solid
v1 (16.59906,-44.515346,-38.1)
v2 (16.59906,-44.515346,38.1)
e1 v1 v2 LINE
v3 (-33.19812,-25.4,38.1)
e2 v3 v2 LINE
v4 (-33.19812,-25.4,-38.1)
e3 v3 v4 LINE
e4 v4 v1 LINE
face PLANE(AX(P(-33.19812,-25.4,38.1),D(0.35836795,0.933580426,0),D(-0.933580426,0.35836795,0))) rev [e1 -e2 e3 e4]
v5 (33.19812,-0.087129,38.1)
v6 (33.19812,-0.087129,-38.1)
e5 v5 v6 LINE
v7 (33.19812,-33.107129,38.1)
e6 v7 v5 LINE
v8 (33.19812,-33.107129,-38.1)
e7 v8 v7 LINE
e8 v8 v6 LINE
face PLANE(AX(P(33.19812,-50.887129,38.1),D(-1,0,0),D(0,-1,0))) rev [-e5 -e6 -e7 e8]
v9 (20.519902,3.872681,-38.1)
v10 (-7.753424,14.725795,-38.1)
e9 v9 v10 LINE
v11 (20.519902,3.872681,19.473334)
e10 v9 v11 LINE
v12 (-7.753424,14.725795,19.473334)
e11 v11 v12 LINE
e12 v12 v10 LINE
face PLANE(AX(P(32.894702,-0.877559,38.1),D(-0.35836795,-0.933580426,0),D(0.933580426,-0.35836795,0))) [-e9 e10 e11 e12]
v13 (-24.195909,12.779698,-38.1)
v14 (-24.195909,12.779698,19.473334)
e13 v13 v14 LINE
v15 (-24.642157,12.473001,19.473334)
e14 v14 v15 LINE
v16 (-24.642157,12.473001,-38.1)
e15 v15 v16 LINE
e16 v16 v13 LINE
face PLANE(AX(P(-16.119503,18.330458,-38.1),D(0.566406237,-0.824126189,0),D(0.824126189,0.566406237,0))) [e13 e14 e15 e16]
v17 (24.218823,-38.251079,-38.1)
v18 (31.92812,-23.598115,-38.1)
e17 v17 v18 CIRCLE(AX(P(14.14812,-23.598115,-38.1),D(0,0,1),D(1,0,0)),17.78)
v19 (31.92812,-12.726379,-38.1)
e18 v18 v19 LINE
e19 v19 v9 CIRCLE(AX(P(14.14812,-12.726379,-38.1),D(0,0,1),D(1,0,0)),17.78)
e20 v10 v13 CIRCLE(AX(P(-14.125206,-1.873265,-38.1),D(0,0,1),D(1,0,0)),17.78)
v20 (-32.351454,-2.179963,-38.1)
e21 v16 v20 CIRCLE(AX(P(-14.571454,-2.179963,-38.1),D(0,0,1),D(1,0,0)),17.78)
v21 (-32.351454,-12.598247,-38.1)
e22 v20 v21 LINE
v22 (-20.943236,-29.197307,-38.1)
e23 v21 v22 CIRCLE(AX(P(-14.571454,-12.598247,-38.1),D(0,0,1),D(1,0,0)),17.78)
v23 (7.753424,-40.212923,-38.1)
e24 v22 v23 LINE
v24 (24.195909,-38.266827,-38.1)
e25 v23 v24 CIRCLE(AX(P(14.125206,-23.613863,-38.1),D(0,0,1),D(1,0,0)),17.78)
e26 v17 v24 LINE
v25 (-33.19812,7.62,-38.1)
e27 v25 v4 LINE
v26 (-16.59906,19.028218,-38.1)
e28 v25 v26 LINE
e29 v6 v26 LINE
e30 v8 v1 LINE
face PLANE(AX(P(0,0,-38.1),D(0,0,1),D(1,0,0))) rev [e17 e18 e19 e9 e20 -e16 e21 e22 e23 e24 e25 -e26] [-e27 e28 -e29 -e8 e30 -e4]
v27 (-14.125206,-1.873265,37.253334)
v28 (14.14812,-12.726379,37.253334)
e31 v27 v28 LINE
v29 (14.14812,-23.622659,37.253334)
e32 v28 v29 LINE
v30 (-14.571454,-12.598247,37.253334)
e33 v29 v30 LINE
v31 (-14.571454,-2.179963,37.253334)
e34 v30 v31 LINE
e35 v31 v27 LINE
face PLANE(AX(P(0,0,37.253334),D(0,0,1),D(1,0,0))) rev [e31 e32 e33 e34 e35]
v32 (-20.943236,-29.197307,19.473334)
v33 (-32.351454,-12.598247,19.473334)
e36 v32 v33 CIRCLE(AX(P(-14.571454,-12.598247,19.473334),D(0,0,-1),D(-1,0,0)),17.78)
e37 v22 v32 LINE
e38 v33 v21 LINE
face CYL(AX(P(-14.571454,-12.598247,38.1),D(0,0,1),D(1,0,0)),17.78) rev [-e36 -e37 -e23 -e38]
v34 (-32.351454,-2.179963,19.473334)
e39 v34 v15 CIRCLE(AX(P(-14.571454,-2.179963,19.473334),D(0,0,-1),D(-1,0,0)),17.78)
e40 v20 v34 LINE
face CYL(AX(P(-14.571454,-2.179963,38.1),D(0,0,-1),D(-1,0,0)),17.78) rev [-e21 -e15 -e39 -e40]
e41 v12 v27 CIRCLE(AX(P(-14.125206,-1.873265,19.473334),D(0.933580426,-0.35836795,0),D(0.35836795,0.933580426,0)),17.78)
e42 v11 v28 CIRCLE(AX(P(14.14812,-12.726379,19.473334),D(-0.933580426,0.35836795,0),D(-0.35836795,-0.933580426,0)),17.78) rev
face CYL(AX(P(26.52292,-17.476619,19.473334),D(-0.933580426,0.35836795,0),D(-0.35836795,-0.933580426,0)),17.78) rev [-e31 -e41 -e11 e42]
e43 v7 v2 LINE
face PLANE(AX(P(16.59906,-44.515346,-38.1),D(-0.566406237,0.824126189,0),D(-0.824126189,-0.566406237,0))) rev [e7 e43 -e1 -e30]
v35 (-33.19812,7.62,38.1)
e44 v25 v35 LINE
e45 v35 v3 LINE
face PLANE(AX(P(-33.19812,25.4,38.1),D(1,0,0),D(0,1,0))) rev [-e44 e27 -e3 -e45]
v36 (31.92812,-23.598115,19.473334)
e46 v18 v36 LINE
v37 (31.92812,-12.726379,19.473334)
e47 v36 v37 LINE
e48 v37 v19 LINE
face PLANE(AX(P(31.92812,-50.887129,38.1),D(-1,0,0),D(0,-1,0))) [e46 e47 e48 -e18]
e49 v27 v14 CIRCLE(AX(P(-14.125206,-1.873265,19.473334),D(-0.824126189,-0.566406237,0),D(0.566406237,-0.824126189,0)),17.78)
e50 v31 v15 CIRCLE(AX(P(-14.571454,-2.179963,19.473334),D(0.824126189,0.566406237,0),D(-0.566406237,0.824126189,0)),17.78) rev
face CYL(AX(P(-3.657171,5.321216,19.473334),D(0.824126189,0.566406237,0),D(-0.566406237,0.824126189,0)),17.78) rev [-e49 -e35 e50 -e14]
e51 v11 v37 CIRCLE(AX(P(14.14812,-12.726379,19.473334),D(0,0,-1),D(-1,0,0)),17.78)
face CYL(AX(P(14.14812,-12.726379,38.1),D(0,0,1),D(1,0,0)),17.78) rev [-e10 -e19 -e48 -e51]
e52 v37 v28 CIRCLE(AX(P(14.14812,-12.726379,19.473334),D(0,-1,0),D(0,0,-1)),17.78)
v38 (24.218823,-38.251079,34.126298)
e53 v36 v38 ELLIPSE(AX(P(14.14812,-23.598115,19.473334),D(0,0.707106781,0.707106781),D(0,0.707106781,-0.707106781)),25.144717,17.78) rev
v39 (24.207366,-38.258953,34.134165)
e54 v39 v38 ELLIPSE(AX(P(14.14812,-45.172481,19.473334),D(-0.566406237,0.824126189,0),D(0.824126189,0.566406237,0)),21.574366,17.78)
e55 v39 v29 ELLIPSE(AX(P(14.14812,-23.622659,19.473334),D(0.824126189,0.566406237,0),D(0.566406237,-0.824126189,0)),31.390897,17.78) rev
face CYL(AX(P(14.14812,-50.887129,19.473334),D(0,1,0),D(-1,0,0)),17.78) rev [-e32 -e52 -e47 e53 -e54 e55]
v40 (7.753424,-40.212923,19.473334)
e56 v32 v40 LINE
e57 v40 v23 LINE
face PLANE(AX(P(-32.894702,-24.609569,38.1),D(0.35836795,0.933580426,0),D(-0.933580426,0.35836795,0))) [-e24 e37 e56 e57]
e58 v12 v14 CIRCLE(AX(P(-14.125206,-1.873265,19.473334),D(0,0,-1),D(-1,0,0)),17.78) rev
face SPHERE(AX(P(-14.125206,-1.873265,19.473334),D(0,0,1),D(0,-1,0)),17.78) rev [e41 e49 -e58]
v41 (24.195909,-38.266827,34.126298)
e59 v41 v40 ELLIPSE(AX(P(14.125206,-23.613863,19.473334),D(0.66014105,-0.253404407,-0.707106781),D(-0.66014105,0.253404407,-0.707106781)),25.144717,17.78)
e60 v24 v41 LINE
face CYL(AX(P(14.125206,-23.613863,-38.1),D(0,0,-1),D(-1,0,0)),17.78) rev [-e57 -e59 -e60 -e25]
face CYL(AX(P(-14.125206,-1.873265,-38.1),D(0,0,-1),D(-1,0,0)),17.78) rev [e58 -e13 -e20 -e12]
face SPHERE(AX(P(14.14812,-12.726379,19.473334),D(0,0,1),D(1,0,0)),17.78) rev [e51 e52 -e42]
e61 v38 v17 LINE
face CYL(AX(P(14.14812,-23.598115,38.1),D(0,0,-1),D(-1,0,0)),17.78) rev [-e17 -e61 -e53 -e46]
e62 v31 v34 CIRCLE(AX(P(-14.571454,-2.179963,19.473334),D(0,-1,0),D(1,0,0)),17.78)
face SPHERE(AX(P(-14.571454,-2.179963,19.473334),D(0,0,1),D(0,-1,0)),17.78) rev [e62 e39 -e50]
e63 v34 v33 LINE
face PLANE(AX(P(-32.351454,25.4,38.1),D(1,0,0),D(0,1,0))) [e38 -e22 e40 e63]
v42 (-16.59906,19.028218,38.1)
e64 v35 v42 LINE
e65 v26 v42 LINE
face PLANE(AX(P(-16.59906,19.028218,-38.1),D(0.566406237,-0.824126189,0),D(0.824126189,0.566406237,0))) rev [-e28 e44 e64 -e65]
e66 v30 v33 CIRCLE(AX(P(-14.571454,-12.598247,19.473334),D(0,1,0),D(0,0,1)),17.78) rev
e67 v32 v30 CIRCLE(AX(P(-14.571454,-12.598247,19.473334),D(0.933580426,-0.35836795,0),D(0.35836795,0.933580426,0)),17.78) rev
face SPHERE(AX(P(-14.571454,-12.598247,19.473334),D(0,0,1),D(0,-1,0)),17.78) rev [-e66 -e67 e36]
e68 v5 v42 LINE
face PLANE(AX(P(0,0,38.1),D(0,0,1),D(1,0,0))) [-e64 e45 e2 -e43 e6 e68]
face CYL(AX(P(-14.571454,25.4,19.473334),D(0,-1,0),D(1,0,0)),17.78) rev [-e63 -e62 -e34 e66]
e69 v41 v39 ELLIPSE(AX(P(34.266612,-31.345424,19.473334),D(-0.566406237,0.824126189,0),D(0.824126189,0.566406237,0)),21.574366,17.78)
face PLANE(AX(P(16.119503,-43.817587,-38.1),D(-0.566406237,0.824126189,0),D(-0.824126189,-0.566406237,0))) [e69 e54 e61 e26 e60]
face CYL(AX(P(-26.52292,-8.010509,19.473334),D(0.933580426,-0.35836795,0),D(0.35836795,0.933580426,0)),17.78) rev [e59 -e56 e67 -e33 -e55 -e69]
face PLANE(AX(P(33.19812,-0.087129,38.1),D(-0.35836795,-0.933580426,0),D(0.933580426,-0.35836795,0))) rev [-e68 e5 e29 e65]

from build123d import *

# Parameters (mm, degrees)
BOSS_EXTRUDE1_DEPTH = 38.1
CUT_EXTRUDE1_DEPTH  = 98.457965419
SHELL1_START        = -38.1
SHELL1_DEPTH        = 75.35333418
FILLET1_R           = 17.78


# Read off the part's stored shape, not the designer's step: Shell1
with BuildPart() as part:
    # Sketch1 → Boss-Extrude1 (new, symmetric)
    with BuildSketch(Plane.XY):
        Polygon((-33.198119966, 25.4), (-33.198119966, -25.4), (33.198119966, -50.887128572), (33.198119966, -0.087128572), align=None)
    extrude(amount=BOSS_EXTRUDE1_DEPTH, both=True)

    # Sketch2 → Cut-Extrude1 (cut, through all)
    with BuildSketch(Plane.XY.offset(38.1)):
        Polygon((16.599059983, -44.515346429), (33.198119966, -33.107128572), (33.198119966, -50.887128572), align=None)
        Polygon((-16.599059983, 19.028217857), (-33.198119966, 25.4), (-33.198119966, 7.62), align=None)
    extrude(amount=-CUT_EXTRUDE1_DEPTH, mode=Mode.SUBTRACT)

    # Shell1 outline → Shell1 (cut)
    with BuildSketch(Plane.XY.offset(SHELL1_START)):
        Polygon((31.928119966, -0.506523102), (-16.486612201, 18.078151343), (-32.351454146, 7.174547563), (-32.351454146, -24.818102704), (16.486612201, -43.565279915), (31.928119966, -32.952625656), align=None)
    extrude(amount=SHELL1_DEPTH, mode=Mode.SUBTRACT)

    # Fillet1
    # the kernel refuses this fillet: 17.78 mm, written as the material it adds along each edge
    with BuildSketch(Plane(origin=(-14.571454146, -2.179962965, 19.47333418), x_dir=(-0.5664062369240325, 0.8241261886225658, 0), z_dir=(0, 0, 1))) as fillet1_piece_1_section:
        Polygon((0, 0), (FILLET1_R * 1.02, 0), (FILLET1_R * 1.02, FILLET1_R * 0.536647960523), (FILLET1_R * 0.577734361663, FILLET1_R * 0.840608712395), align=None)
    fillet1_piece_1 = extrude(amount=FILLET1_R * 1.02, mode=Mode.PRIVATE)
    fillet1_piece_1 = fillet1_piece_1 - Plane(origin=(-14.571454146, -2.179962965, 19.47333418), x_dir=(0.8849876374628157, -0.4656145203255411, 0), z_dir=(0, 0, 1)) * Sphere(FILLET1_R, mode=Mode.PRIVATE)
    add(fillet1_piece_1)
    with BuildSketch(Plane(origin=(-14.571454146, -12.59824726, 19.47333418), x_dir=(-1, 0, 0), z_dir=(0, 0, 1))) as fillet1_piece_2_section:
        Polygon((0, 0), (FILLET1_R * 1.02, 0), (FILLET1_R * 1.02, FILLET1_R * 0.701026577777), (FILLET1_R * 0.365535308531, FILLET1_R * 0.952252035029), align=None)
    fillet1_piece_2 = extrude(amount=FILLET1_R * 1.02, mode=Mode.PRIVATE)
    fillet1_piece_2 = fillet1_piece_2 - Plane(origin=(-14.571454146, -12.59824726, 19.47333418), x_dir=(0.8241261886205663, 0.5664062369269417, 0), z_dir=(0, 0, 1)) * Sphere(FILLET1_R, mode=Mode.PRIVATE)
    add(fillet1_piece_2)
    with BuildSketch(Plane(origin=(14.148119966, -12.726378546, 19.47333418), x_dir=(0.35836794954893786, 0.9335804264958054, 0), z_dir=(0, 0, 1))) as fillet1_piece_3_section:
        Polygon((0, 0), (FILLET1_R * 1.02, 0), (FILLET1_R * 1.02, -FILLET1_R * 0.701026577771), (FILLET1_R * 0.36553530854, -FILLET1_R * 0.952252035026), align=None)
    fillet1_piece_3 = extrude(amount=FILLET1_R * 1.02, mode=Mode.PRIVATE)
    fillet1_piece_3 = fillet1_piece_3 - Plane(origin=(14.148119966, -12.726378546, 19.47333418), x_dir=(-0.824126188623119, -0.5664062369232272, 0), z_dir=(0, 0, 1)) * Sphere(FILLET1_R, mode=Mode.PRIVATE)
    add(fillet1_piece_3)
    with BuildSketch(Plane(origin=(-14.125206416, -1.873265397, 19.47333418), x_dir=(0.35836794954893786, 0.9335804264958054, 0), z_dir=(0, 0, 1))) as fillet1_piece_4_section:
        Polygon((0, 0), (FILLET1_R * 1.02, 0), (FILLET1_R * 1.02, FILLET1_R * 0.536647960524), (FILLET1_R * 0.577734361661, FILLET1_R * 0.840608712396), align=None)
    fillet1_piece_4 = extrude(amount=FILLET1_R * 1.02, mode=Mode.PRIVATE)
    fillet1_piece_4 = fillet1_piece_4 - Plane(origin=(-14.125206416, -1.873265397, 19.47333418), x_dir=(0.11753739745542074, -0.9930684569552123, 0), z_dir=(0, 0, 1)) * Sphere(FILLET1_R, mode=Mode.PRIVATE)
    add(fillet1_piece_4)
    with BuildSketch(Plane(origin=(-32.351454146, -2.179962965, 37.25333418), x_dir=(0, 0, -1), z_dir=(0, -1, 0))) as fillet1_piece_5:
        with BuildLine():
            CenterArc((FILLET1_R, FILLET1_R), FILLET1_R, 180, 90)
            Line((0, FILLET1_R), (0, 0))
            Line((0, 0), (FILLET1_R, 0))
        make_face()
    extrude(amount=10.418284295)
    with BuildSketch(Plane(origin=(-20.943236289, -29.197307243, 37.25333418), x_dir=(0, 0, -1), z_dir=(0.9335804264990358, -0.3583679495405224, 0))) as fillet1_piece_6_section:
        with BuildLine():
            CenterArc((FILLET1_R, FILLET1_R), FILLET1_R, 180, 90)
            Line((0, FILLET1_R), (0, 0))
            Line((0, 0), (FILLET1_R, 0))
        make_face()
    fillet1_piece_6 = extrude(amount=84.542794822, mode=Mode.PRIVATE)
    fillet1_piece_6 = split(fillet1_piece_6, bisect_by=Plane(origin=(10.612775851, -47.602255792, 33.386694553), z_dir=(-0.5664062369254325, 0.8241261886216036, 0)), keep=Keep.TOP, mode=Mode.PRIVATE)
    fillet1_piece_6 = split(fillet1_piece_6, bisect_by=Plane(origin=(31.928119966, -33.018136408, 33.386694553), z_dir=(-1, 0, 0)), keep=Keep.TOP, mode=Mode.PRIVATE)
    add(fillet1_piece_6)
    with BuildSketch(Plane(origin=(31.928119966, -77.402625656, 37.25333418), x_dir=(0, 0, -1), z_dir=(0, 1, 0))) as fillet1_piece_7_section:
        with BuildLine():
            CenterArc((FILLET1_R, FILLET1_R), FILLET1_R, 180, 90)
            Line((0, FILLET1_R), (0, 0))
            Line((0, 0), (FILLET1_R, 0))
        make_face()
    fillet1_piece_7 = extrude(amount=64.67624711, mode=Mode.PRIVATE)
    fillet1_piece_7 = split(fillet1_piece_7, bisect_by=Plane(origin=(19.754469789, -44.819692915, 33.477432333), z_dir=(0.3583679495405224, 0.9335804264990358, 0)), keep=Keep.TOP, mode=Mode.PRIVATE)
    fillet1_piece_7 = split(fillet1_piece_7, bisect_by=Plane(origin=(33.035848264, -32.191305089, 33.477432333), z_dir=(-0.5664062369254325, 0.8241261886216036, 0)), keep=Keep.TOP, mode=Mode.PRIVATE)
    add(fillet1_piece_7)
    with BuildSketch(Plane(origin=(-32.351454146, -24.818102704, -38.1), x_dir=(0, 1, 0), z_dir=(0, 0, 1))) as fillet1_piece_8:
        with BuildLine():
            CenterArc((FILLET1_R * 0.687280958605, -FILLET1_R), FILLET1_R, 90, 69)
            Line((-FILLET1_R * 0.246299467894, -FILLET1_R * 0.641632050459), (0, 0))
            Line((0, 0), (FILLET1_R * 0.687280958605, 0))
        make_face()
    extrude(amount=57.57333418)
    with BuildSketch(Plane(origin=(-32.351454146, 7.174547563, -38.1), x_dir=(0.8241261886225659, 0.5664062369240322, 0), z_dir=(0, 0, 1))) as fillet1_piece_9:
        with BuildLine():
            CenterArc((FILLET1_R * 0.526125451493, -FILLET1_R), FILLET1_R, 90, 55.5)
            Line((-FILLET1_R * 0.29800073713, -FILLET1_R * 0.433593763076), (0, 0))
            Line((0, 0), (FILLET1_R * 0.526125451493, 0))
        make_face()
    extrude(amount=57.57333418)
    with BuildSketch(Plane(origin=(16.486612201, -43.565279915, -38.1), x_dir=(-0.933580426499036, 0.3583679495405219, 0), z_dir=(0, 0, 1))) as fillet1_piece_10:
        with BuildLine():
            CenterArc((FILLET1_R * 0.526125451489, -FILLET1_R), FILLET1_R, 90, 55.5)
            Line((-FILLET1_R * 0.29800073713, -FILLET1_R * 0.433593763072), (0, 0))
            Line((0, 0), (FILLET1_R * 0.526125451489, 0))
        make_face()
    extrude(amount=75.35333418)
    with BuildSketch(Plane(origin=(31.928119966, -32.952625656, -38.1), x_dir=(-0.8241261886216035, -0.5664062369254323, 0), z_dir=(0, 0, 1))) as fillet1_piece_11:
        with BuildLine():
            CenterArc((FILLET1_R * 0.526125451492, -FILLET1_R), FILLET1_R, 90, 55.5)
            Line((-FILLET1_R * 0.29800073713, -FILLET1_R * 0.433593763075), (0, 0))
            Line((0, 0), (FILLET1_R * 0.526125451492, 0))
        make_face()
    extrude(amount=75.35333418)
    with BuildSketch(Plane(origin=(-16.486612201, 18.078151343, -38.1), x_dir=(0.9335804264958054, -0.35836794954893825, 0), z_dir=(0, 0, 1))) as fillet1_piece_12:
        with BuildLine():
            CenterArc((FILLET1_R * 0.526125451494, -FILLET1_R), FILLET1_R, 90, 55.5)
            Line((-FILLET1_R * 0.29800073713, -FILLET1_R * 0.433593763078), (0, 0))
            Line((0, 0), (FILLET1_R * 0.526125451494, 0))
        make_face()
    extrude(amount=57.57333418)
    with BuildSketch(Plane(origin=(31.928119966, -0.506523102, -38.1), x_dir=(-0.9335804264958055, 0.3583679495489376, 0), z_dir=(0, 0, 1))) as fillet1_piece_13:
        with BuildLine():
            CenterArc((FILLET1_R * 0.687280958599, FILLET1_R), FILLET1_R, 201, 69)
            Line((-FILLET1_R * 0.246299467897, FILLET1_R * 0.641632050451), (0, 0))
            Line((0, 0), (FILLET1_R * 0.687280958599, 0))
        make_face()
    extrude(amount=57.57333418)
    with BuildSketch(Plane(origin=(20.519902109, 3.872681437, 37.25333418), x_dir=(0, 0, -1), z_dir=(-0.9335804264958054, 0.35836794954893786, 0))) as fillet1_piece_14:
        with BuildLine():
            CenterArc((FILLET1_R, FILLET1_R), FILLET1_R, 180, 90)
            Line((0, FILLET1_R), (0, 0))
            Line((0, 0), (FILLET1_R, 0))
        make_face()
    extrude(amount=30.284832008)
    with BuildSketch(Plane(origin=(-24.195909309, 12.779698237, 37.25333418), x_dir=(0, 0, -1), z_dir=(-0.8241261886225658, -0.5664062369240325, 0))) as fillet1_piece_15:
        with BuildLine():
            CenterArc((FILLET1_R, FILLET1_R), FILLET1_R, 180, 90)
            Line((0, FILLET1_R), (0, 0))
            Line((0, 0), (FILLET1_R, 0))
        make_face()
    extrude(amount=0.541479856)


solid = part.part
